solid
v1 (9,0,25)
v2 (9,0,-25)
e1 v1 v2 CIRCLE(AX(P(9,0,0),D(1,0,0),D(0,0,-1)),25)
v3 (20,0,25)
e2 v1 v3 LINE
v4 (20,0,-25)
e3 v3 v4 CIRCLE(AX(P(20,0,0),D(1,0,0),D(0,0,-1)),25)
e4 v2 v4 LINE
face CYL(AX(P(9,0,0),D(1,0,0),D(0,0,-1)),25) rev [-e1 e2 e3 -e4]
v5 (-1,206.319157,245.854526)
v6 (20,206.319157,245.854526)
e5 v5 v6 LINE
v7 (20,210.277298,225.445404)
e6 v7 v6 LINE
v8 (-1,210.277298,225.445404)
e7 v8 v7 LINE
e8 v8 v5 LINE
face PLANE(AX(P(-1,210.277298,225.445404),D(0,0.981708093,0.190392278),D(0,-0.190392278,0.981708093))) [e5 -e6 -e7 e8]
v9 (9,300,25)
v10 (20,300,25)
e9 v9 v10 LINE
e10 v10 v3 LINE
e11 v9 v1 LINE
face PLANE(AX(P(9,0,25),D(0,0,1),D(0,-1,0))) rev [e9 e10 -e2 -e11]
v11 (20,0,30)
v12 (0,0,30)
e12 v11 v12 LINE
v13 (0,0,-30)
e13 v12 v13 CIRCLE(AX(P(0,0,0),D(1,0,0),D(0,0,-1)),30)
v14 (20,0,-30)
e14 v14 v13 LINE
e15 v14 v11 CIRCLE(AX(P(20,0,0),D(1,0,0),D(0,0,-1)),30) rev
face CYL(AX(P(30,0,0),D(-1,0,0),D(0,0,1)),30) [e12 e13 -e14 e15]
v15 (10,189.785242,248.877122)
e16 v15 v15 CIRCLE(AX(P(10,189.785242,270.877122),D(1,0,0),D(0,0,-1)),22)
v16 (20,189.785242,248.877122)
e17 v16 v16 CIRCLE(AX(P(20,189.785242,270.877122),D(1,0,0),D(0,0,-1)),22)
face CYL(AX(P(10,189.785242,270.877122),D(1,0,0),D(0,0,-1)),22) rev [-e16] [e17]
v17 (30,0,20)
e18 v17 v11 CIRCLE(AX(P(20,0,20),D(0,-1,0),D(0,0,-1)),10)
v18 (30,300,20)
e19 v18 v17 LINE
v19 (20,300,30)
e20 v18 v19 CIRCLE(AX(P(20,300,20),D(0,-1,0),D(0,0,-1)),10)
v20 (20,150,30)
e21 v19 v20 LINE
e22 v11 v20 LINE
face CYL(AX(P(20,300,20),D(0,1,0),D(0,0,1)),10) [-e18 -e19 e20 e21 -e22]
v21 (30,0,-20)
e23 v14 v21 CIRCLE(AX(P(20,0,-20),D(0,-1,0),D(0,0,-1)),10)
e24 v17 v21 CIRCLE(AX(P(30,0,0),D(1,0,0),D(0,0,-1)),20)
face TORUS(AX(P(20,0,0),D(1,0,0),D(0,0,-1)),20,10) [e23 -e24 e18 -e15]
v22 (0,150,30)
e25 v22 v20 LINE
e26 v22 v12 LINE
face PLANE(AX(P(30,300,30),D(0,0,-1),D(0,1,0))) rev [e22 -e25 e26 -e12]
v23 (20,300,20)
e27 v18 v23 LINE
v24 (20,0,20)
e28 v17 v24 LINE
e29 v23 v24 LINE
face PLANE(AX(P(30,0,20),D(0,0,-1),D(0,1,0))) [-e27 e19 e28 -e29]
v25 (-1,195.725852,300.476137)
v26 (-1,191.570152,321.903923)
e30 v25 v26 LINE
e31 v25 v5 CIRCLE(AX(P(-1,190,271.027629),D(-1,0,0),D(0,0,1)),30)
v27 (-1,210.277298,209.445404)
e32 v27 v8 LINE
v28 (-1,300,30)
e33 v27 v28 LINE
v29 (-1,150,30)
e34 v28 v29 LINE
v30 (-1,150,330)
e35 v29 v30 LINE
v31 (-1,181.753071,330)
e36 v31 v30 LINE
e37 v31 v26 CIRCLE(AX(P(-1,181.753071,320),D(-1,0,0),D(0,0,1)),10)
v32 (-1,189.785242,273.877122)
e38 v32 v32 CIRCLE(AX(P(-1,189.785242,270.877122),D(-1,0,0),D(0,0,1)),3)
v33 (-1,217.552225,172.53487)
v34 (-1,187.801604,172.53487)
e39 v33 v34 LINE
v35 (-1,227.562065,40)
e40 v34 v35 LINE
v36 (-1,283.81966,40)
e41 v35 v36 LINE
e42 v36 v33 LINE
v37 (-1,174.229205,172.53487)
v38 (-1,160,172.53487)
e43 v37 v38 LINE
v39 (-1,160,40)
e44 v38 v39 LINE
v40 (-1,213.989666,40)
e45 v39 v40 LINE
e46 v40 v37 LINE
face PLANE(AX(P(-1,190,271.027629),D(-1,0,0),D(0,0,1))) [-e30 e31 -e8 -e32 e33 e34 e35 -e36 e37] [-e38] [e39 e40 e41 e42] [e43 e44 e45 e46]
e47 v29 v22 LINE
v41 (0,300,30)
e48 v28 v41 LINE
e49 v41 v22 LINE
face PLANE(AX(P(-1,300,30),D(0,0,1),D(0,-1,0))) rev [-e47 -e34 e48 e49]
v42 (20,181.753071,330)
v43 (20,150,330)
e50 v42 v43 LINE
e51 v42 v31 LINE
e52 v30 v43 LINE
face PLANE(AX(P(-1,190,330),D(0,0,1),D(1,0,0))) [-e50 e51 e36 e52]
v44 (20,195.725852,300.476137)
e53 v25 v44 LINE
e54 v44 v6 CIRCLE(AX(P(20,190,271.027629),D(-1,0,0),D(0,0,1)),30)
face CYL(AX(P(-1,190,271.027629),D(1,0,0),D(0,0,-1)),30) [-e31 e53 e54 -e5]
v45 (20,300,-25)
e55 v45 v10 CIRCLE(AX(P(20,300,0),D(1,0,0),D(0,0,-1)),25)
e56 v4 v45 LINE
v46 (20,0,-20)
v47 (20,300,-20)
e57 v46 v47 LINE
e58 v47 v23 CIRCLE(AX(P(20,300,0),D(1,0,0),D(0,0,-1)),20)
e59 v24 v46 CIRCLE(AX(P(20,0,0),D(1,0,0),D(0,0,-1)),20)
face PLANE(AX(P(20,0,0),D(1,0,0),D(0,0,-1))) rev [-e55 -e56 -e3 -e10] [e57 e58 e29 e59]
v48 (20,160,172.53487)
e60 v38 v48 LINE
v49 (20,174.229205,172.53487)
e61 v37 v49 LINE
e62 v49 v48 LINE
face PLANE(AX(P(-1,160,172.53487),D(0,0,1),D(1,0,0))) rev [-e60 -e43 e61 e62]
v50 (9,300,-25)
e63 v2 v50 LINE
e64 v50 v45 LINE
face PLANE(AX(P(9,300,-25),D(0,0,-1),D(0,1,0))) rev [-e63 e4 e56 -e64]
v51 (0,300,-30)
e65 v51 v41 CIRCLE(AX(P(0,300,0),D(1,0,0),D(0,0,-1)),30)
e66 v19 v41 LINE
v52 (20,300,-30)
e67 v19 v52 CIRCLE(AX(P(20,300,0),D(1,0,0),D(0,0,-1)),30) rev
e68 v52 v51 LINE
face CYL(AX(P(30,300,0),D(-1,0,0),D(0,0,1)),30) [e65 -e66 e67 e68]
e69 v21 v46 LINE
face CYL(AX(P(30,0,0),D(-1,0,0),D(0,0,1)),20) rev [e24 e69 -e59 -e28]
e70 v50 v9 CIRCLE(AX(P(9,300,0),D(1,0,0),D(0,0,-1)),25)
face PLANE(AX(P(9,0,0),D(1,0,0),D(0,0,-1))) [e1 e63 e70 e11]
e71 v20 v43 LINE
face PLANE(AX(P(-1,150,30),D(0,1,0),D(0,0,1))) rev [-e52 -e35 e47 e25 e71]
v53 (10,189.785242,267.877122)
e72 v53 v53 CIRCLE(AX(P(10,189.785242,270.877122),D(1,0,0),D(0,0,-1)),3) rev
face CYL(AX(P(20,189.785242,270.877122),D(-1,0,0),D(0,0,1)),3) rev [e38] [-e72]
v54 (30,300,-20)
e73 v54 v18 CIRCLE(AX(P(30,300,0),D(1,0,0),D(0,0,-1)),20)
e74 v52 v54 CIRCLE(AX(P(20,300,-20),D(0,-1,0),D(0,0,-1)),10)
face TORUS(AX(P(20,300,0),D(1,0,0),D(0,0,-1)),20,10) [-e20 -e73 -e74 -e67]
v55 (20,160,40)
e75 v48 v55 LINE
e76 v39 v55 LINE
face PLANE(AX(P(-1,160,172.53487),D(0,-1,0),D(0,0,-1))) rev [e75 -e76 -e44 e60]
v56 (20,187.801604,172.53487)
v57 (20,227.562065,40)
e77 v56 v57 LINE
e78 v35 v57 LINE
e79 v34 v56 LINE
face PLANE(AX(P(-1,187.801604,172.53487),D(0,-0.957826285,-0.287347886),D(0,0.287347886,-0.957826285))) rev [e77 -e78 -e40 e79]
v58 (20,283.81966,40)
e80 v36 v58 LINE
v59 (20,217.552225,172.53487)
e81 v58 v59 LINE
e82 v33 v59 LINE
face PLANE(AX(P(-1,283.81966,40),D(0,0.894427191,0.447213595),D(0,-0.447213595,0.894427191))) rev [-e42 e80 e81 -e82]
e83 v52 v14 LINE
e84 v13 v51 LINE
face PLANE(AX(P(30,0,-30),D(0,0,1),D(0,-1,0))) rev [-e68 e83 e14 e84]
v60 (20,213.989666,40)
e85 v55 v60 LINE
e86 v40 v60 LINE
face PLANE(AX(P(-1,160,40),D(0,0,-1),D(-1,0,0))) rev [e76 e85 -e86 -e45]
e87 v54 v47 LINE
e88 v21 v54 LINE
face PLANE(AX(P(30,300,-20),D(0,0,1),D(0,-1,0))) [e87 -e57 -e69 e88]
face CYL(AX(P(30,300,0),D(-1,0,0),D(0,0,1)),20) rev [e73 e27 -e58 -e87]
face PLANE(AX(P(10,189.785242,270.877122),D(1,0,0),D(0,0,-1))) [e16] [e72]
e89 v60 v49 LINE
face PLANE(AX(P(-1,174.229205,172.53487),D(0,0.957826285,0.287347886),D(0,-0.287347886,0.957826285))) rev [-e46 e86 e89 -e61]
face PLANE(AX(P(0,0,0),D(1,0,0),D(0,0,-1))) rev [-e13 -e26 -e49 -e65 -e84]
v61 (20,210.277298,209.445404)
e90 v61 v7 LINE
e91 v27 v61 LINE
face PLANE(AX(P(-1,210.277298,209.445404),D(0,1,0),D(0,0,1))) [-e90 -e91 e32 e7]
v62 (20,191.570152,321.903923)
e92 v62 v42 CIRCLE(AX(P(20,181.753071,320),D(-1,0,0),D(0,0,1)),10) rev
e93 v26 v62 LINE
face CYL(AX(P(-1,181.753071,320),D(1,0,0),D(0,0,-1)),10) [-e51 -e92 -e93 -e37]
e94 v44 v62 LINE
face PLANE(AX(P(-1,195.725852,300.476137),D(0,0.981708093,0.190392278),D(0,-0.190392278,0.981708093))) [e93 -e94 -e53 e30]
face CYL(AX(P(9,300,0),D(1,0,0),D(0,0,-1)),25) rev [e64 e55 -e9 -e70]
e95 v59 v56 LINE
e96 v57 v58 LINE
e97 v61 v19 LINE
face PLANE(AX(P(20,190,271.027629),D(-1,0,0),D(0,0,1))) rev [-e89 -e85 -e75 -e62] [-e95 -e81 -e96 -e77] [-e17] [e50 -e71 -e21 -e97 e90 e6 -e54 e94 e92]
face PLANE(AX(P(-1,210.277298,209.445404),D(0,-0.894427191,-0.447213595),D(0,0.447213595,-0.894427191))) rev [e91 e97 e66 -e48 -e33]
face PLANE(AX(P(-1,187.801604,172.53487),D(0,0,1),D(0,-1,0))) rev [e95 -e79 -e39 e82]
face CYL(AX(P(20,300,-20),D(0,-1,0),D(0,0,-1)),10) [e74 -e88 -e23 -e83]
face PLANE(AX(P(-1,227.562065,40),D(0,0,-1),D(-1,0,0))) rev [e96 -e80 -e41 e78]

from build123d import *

# Parameters (mm, degrees)
BOSS_EXTRUDE3_DEPTH     = 10
BOSS_EXTRUDE4_DEPTH     = 30
CUT_EXTRUDE1_DEPTH      = 10
CUT_EXTRUDE1_DEPTH_BACK = 1
FILLET1_R               = 10
BOSS_EXTRUDE5_DEPTH     = 21
CUT_EXTRUDE2_DEPTH      = 21
FILLET2_R               = 10
SKETCH15_R              = 3
CUT_EXTRUDE3_DEPTH      = 21
SKETCH16_R              = 22
CUT_EXTRUDE4_DEPTH      = 10


with BuildPart() as part:
    # Sketch1 → Boss-Extrude3 (new body)
    with BuildSketch(Plane(origin=(0, 0, 0), x_dir=(0, 0, -1), z_dir=(1, 0, 0))):
        with BuildLine():
            Line((-20, 0), (-20, 300))
            ThreePointArc((-20, 300), (0, 320), (20, 300))
            Line((20, 300), (20, 0))
            ThreePointArc((20, 0), (0, -20), (-20, 0))
        make_face()
    extrude(amount=BOSS_EXTRUDE3_DEPTH)

    # Sketch1<5> → Boss-Extrude4 (add)
    with BuildSketch(Plane(origin=(0, 0, 0), x_dir=(0, 0, -1), z_dir=(1, 0, 0))):
        with BuildLine():
            Line((-30, 300), (-30, 0))
            ThreePointArc((-30, 0), (0, -30), (30, 0))
            Line((30, 0), (30, 300))
            ThreePointArc((30, 300), (0, 330), (-30, 300))
        make_face()
        with BuildLine():
            Line((-20, 0), (-20, 300))
            ThreePointArc((-20, 300), (0, 320), (20, 300))
            Line((20, 300), (20, 0))
            ThreePointArc((20, 0), (0, -20), (-20, 0))
        make_face(mode=Mode.SUBTRACT)
    extrude(amount=BOSS_EXTRUDE4_DEPTH)

    # Sketch2 → Cut-Extrude1 (cut, two sides: drawn at the far end of the back side and taken through both)
    with BuildSketch(Plane(origin=(10, 0, 0), x_dir=(0, 0, -1), z_dir=(1, 0, 0)).offset(-CUT_EXTRUDE1_DEPTH_BACK)):
        with BuildLine():
            Line((-25, 0), (-25, 300))
            ThreePointArc((-25, 300), (0, 325), (25, 300))
            Line((25, 300), (25, 0))
            ThreePointArc((25, 0), (0, -25), (-25, 0))
        make_face()
    extrude(amount=CUT_EXTRUDE1_DEPTH + CUT_EXTRUDE1_DEPTH_BACK, mode=Mode.SUBTRACT)

    # Fillet1
    fillet1_edges = [part.edges().sort_by_distance(p)[0] for p in [
        (30, 330, 0),
        (30, 150, 30),
        (30, -30, 0),
        (30, 150, -30),
    ]]
    fillet(fillet1_edges, radius=FILLET1_R - 0.0001)  # a hair under: the kernel refuses the full size

    # Sketch4 → Boss-Extrude5 (add)
    with BuildSketch(Plane.ZY.offset(-20)):
        with BuildLine():
            Line((30, 300), (30, 150))
            Line((30, 150), (330, 150))
            Line((330, 150), (330, 190))
            Line((330, 190), (300.476136934, 195.7258523))
            ThreePointArc((300.476136934, 195.7258523), (276.739397408, 219.4512428), (245.854526043, 206.319156964))
            Line((245.854526043, 206.319156964), (225.44540351, 210.277298245))
            Line((225.44540351, 210.277298245), (209.44540351, 210.277298245))
            Line((209.44540351, 210.277298245), (30, 300))
        make_face()
    extrude(amount=BOSS_EXTRUDE5_DEPTH)

    # Sketch6 → Cut-Extrude2 (cut)
    with BuildSketch(Plane(origin=(20, 0, 0), x_dir=(0, 0, -1), z_dir=(1, 0, 0))):
        Polygon((-40, 160), (-40, 213.989666216), (-172.534869505, 174.229205364), (-172.534869505, 160), align=None)
        Polygon((-40, 283.819660113), (-172.534869505, 217.55222536), (-172.534869505, 187.801603826), (-40, 227.562064677), align=None)
    extrude(amount=-CUT_EXTRUDE2_DEPTH, mode=Mode.SUBTRACT)

    # Fillet2
    fillet2_edges = [part.edges().sort_by_distance(p)[0] for p in [
        (9.5, 190, 330),
    ]]
    fillet(fillet2_edges, radius=FILLET2_R)

    # Sketch15 → Cut-Extrude3 (cut)
    with BuildSketch(Plane.ZY.offset(1)):
        with Locations((270.877121852, 189.785242032)):
            Circle(SKETCH15_R)
    extrude(amount=-CUT_EXTRUDE3_DEPTH, mode=Mode.SUBTRACT)

    # Sketch16 → Cut-Extrude4 (cut)
    with BuildSketch(Plane(origin=(20, 0, 0), x_dir=(0, 0, -1), z_dir=(1, 0, 0))):
        with Locations((-270.877121852, 189.785242032)):
            Circle(SKETCH16_R)
    extrude(amount=-CUT_EXTRUDE4_DEPTH, mode=Mode.SUBTRACT)


solid = part.part
